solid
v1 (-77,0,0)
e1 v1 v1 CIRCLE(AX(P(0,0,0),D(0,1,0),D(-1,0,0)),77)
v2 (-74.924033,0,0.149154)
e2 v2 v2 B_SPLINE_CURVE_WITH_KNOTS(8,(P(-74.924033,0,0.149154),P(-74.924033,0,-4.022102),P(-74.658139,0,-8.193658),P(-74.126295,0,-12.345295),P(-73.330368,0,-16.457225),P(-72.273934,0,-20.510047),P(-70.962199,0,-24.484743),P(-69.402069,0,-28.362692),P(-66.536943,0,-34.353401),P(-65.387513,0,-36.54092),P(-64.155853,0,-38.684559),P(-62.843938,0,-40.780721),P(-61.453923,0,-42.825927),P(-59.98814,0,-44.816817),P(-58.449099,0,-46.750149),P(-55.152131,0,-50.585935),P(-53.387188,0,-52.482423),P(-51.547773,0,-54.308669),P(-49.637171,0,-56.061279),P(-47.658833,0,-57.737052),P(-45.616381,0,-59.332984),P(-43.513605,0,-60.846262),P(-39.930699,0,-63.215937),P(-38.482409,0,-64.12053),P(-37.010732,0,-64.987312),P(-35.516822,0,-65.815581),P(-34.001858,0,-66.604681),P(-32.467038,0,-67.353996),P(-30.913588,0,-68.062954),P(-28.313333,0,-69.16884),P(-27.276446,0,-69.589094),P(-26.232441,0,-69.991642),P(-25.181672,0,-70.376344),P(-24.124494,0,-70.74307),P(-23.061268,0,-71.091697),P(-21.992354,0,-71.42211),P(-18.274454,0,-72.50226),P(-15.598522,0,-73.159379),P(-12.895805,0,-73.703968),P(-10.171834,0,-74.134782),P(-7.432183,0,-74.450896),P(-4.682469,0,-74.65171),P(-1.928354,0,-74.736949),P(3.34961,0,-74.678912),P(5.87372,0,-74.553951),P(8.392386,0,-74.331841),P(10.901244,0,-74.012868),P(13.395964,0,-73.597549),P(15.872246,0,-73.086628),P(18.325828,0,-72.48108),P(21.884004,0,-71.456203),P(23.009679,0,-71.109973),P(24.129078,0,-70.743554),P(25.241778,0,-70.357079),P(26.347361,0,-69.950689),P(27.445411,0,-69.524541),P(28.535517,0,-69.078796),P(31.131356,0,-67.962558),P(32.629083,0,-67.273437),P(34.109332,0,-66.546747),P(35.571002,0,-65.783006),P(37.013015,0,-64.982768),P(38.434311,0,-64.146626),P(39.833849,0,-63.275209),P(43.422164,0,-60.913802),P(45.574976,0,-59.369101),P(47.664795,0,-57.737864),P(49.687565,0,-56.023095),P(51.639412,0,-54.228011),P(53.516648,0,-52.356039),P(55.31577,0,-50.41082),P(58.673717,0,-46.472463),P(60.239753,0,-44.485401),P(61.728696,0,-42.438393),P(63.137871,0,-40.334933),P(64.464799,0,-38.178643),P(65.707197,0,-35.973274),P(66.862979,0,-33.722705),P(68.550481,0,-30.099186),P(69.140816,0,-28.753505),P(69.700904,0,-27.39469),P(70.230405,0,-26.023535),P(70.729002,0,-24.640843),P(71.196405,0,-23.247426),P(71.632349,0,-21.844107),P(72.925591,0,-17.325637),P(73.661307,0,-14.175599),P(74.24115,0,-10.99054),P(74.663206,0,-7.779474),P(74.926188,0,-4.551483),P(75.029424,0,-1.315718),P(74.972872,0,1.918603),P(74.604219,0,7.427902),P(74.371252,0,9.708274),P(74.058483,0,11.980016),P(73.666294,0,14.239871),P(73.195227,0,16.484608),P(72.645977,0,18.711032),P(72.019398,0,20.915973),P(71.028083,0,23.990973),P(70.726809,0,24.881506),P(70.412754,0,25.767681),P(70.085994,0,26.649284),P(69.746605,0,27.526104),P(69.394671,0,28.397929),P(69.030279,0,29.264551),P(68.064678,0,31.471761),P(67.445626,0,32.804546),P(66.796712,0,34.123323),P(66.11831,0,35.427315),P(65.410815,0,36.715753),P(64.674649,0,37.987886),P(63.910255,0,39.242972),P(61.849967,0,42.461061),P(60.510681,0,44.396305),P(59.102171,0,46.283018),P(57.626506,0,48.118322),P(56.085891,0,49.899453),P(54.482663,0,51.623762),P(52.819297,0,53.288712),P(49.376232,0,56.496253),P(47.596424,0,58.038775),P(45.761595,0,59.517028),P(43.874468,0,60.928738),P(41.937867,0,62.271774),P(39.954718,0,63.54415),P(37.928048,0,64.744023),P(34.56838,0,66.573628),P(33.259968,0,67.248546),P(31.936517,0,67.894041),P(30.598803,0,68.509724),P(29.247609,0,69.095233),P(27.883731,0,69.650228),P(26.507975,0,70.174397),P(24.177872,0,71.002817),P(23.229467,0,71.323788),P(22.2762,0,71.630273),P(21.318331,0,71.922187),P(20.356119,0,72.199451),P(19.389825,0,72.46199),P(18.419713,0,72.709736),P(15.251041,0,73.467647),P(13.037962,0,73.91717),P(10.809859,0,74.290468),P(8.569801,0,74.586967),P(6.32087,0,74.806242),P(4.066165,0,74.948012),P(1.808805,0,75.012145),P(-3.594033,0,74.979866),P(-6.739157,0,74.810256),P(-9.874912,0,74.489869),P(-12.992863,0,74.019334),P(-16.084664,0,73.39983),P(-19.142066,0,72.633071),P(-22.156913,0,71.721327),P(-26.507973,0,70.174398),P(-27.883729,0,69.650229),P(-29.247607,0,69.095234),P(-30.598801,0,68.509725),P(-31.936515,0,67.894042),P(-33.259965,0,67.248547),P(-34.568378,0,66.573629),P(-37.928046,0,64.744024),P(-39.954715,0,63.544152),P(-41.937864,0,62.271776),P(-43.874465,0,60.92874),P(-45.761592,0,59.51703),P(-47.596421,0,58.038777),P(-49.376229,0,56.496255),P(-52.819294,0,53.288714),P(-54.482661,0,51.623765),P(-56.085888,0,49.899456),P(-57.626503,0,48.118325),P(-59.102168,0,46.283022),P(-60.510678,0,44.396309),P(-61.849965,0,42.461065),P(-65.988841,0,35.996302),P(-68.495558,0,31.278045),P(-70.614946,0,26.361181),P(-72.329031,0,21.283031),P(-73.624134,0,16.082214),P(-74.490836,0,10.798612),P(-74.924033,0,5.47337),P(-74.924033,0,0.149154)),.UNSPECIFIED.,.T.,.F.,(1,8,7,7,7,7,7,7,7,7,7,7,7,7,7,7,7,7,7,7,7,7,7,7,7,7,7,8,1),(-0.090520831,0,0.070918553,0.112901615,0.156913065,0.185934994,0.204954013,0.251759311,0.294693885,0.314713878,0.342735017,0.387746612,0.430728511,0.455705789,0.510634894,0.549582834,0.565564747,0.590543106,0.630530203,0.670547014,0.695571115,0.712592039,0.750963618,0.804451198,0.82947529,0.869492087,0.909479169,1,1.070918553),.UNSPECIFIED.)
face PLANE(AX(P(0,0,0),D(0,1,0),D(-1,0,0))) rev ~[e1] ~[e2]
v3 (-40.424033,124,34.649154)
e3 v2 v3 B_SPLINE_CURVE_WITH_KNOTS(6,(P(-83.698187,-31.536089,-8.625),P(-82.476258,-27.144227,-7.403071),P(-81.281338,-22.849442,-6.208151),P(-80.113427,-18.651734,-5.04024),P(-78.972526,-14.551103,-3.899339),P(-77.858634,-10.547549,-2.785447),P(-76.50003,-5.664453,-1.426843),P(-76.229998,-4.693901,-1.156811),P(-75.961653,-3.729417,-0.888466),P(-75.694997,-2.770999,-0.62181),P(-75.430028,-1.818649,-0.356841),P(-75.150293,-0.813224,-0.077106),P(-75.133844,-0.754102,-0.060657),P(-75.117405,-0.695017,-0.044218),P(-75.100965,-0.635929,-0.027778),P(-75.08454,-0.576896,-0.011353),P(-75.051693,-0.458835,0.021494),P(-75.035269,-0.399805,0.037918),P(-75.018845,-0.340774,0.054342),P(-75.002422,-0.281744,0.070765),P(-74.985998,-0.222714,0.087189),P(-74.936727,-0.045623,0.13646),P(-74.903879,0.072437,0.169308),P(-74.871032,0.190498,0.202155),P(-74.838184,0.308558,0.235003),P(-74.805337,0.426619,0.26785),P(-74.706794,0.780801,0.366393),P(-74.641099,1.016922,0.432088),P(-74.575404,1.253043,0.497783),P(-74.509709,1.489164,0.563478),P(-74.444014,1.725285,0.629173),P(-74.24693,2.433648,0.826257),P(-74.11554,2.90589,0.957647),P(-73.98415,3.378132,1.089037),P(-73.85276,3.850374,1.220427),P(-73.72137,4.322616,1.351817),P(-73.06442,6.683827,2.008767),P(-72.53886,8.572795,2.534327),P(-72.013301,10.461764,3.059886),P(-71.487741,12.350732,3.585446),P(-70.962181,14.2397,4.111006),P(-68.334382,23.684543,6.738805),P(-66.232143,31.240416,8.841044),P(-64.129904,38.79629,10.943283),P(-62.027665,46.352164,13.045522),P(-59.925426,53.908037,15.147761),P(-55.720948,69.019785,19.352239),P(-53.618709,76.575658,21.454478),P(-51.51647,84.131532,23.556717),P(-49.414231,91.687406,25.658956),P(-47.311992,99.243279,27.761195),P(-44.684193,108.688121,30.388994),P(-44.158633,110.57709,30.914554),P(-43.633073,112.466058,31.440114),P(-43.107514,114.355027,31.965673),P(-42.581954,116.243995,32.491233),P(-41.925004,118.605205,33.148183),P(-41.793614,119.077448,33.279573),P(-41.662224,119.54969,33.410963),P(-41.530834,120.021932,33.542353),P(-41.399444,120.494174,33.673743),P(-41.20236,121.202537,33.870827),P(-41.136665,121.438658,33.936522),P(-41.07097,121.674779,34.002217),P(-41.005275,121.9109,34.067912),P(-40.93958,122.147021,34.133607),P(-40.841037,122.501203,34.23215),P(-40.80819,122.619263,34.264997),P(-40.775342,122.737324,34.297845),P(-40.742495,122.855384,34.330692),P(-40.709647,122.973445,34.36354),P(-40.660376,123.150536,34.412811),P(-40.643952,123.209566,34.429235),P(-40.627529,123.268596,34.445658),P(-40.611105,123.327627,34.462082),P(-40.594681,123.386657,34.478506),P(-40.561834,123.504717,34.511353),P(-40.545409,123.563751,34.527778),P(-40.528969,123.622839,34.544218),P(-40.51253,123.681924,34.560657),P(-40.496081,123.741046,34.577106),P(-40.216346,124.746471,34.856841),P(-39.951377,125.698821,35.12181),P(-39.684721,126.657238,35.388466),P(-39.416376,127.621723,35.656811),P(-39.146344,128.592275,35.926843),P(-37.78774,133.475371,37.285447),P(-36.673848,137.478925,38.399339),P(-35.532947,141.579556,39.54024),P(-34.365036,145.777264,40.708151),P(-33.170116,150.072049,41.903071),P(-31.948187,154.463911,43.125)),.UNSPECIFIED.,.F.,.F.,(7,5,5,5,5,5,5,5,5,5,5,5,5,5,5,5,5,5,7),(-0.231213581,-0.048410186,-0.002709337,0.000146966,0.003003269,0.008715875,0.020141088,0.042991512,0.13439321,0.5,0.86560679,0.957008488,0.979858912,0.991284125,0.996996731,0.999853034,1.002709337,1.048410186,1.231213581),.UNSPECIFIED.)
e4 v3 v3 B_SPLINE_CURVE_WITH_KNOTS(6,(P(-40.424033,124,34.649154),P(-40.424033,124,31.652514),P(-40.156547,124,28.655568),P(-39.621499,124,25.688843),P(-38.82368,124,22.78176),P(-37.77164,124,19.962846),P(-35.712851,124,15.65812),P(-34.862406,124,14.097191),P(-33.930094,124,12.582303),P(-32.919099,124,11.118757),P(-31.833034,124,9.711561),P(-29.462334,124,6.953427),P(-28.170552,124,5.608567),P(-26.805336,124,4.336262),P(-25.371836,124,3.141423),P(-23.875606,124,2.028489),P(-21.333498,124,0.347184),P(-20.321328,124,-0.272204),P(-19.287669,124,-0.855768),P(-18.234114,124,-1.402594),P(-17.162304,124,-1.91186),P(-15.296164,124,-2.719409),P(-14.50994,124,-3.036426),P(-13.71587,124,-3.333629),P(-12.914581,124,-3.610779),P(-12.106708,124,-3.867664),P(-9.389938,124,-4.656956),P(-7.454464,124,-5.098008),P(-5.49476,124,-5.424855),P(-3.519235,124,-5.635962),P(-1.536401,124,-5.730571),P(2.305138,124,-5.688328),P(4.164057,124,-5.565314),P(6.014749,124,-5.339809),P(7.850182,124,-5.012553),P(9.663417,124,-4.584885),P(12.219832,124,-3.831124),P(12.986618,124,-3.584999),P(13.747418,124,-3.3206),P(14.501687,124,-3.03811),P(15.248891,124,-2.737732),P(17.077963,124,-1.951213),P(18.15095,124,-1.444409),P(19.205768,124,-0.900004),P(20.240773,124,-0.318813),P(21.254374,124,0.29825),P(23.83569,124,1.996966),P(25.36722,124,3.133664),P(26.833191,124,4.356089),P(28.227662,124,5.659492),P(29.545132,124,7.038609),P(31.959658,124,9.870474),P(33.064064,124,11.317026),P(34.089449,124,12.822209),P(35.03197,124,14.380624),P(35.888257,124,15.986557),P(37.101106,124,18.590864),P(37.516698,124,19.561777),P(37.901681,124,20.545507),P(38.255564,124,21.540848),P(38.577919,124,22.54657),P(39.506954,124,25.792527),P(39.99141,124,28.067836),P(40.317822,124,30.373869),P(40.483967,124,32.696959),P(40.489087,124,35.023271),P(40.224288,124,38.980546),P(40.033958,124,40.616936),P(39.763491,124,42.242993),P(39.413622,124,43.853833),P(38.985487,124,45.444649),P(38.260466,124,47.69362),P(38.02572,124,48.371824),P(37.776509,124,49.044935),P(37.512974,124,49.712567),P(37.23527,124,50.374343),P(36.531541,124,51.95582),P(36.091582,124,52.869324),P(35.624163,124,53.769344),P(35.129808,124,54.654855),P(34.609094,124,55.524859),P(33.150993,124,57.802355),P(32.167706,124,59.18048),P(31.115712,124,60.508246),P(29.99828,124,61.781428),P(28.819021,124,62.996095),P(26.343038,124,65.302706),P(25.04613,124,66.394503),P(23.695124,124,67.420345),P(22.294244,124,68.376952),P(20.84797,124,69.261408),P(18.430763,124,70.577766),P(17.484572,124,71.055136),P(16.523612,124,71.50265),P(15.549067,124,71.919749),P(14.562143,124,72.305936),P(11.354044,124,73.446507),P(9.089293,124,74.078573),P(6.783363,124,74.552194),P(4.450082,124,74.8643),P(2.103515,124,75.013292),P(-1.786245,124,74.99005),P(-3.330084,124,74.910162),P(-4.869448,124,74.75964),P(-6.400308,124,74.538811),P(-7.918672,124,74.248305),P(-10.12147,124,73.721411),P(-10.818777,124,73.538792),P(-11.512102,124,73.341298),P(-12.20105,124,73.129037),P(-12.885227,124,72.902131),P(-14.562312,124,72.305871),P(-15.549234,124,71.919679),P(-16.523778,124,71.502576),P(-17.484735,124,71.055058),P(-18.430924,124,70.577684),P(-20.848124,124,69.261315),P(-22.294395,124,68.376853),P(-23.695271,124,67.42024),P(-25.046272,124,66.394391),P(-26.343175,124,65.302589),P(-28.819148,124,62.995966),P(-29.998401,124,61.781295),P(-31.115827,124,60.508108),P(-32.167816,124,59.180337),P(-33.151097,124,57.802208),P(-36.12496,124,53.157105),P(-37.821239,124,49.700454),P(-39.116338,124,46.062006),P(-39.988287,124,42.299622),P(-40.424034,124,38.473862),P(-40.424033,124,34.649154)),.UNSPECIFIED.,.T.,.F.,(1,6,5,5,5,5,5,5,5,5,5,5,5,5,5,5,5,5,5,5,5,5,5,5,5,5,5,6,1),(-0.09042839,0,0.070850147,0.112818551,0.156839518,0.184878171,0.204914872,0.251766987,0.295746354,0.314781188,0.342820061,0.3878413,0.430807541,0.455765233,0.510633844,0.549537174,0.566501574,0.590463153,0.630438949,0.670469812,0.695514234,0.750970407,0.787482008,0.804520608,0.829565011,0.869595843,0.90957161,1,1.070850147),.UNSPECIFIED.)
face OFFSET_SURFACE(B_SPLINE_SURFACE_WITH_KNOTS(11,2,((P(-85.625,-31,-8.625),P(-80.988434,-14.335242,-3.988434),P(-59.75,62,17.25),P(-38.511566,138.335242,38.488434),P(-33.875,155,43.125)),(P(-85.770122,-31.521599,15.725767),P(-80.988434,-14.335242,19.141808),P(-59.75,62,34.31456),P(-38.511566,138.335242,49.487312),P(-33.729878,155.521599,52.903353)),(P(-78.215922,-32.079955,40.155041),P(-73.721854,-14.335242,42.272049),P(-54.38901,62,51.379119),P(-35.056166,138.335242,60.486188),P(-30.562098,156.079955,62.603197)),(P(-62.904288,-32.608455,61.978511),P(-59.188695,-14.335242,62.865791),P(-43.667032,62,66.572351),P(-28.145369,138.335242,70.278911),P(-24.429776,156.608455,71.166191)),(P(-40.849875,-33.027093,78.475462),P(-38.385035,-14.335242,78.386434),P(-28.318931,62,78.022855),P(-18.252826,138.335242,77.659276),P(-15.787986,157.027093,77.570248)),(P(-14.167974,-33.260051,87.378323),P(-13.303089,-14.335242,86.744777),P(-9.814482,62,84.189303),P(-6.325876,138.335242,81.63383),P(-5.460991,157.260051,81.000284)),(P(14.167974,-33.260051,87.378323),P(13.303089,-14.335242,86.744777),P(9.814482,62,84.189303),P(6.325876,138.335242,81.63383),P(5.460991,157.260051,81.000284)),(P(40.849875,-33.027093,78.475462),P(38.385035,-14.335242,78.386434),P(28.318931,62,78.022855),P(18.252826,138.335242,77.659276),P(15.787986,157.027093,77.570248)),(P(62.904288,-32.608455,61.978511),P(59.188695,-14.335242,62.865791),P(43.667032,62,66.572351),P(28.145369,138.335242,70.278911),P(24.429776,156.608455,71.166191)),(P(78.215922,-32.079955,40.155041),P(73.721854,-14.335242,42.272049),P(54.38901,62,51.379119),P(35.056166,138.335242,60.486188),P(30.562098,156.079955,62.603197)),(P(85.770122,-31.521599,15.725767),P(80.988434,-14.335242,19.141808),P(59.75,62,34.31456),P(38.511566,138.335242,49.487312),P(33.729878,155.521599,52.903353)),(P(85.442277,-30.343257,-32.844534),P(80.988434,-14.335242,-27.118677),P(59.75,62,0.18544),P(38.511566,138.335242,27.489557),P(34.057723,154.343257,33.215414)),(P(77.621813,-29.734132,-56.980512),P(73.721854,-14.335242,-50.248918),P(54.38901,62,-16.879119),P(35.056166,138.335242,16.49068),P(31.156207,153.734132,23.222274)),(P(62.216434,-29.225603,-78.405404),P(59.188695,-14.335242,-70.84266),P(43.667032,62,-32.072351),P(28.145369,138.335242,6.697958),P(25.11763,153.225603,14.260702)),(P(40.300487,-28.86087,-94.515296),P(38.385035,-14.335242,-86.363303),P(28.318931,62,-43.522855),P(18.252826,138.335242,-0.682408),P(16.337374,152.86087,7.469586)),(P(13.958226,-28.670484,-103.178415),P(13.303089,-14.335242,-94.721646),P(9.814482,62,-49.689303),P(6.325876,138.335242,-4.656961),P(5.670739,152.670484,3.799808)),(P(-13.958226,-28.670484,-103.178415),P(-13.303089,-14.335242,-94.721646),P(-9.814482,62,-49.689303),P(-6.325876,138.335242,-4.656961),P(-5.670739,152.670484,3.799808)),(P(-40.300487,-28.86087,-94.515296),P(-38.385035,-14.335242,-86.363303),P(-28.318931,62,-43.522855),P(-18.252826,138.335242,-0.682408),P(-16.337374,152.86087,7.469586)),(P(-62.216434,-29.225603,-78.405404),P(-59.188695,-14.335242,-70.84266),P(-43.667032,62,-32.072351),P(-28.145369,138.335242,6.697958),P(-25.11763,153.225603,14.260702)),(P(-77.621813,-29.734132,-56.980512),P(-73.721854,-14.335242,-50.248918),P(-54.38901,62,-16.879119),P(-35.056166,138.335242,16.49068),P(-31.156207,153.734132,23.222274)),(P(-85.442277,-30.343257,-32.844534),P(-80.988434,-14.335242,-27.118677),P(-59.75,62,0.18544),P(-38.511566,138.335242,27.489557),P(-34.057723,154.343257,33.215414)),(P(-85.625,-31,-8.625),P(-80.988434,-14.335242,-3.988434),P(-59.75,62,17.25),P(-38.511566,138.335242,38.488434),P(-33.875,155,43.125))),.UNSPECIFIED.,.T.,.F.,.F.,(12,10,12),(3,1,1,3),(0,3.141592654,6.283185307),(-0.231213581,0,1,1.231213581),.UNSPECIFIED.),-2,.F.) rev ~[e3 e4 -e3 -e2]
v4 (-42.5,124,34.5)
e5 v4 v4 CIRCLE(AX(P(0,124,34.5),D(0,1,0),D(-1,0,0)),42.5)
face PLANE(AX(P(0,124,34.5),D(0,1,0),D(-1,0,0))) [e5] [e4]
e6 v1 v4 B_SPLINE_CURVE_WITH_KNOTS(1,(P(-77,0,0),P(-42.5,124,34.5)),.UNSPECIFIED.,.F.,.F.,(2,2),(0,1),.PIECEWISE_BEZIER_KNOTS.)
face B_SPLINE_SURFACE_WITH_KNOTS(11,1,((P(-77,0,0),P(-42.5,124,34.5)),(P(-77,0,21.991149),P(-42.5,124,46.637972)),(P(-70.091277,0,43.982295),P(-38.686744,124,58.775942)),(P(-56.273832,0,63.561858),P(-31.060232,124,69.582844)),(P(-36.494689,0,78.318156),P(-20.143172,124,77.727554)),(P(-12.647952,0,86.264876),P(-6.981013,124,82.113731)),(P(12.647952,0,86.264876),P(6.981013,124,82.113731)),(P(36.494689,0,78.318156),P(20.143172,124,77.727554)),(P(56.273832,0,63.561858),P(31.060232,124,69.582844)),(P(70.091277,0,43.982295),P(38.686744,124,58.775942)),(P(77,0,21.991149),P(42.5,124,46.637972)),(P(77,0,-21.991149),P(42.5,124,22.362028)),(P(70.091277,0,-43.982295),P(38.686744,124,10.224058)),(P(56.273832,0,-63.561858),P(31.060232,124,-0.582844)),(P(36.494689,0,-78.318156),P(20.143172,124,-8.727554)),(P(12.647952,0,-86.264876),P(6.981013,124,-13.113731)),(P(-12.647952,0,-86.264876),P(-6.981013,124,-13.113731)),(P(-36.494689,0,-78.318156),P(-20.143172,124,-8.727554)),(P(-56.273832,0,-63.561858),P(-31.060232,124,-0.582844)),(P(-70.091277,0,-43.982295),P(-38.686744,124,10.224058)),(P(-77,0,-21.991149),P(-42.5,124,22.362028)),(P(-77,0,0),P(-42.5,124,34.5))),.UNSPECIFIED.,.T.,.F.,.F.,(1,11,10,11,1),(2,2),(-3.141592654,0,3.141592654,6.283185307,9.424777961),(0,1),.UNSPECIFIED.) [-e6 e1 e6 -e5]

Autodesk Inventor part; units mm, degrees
ref_plane "YZ Plane" through (0, 0, 0) normal (1, 0, 0) x (0, 1, 0)
ref_plane "XY Plane" through (0, 0, 0) normal (0, 0, 1) x (1, 0, 0)
sketch "Szkic6" plane through (0, 0, 0) normal (0, 1, 0) x (-1, 0, 0)
  circle A0 centre (0, 0) radius 77
  dimension "d33" = 154
ref_plane "Płaszczyzna konstrukcyjna1" through (0, 124, 0) normal (0, 1, 0) x (-1, 0, 0)
sketch "Szkic7" plane through (0, 124, 0) normal (0, 1, 0) x (-1, 0, 0)
  circle A0 centre (0, 34.5) radius 42.5
  line L0 (0, -20.3) -> (0, 20.3) construction
  circle A1 centre (0, 0) radius 77 construction
  dimension "d35" = 85
loft "Wyciągnięcie złożone1" add profiles "Szkic6", "Szkic7"
shell "Skorupa1" thickness 2 removed faces 2 at (-9.753, 124, 25.7609) at (-23.2587, 0, 21.3864)
equation "\"d33\" = OD1"
equation "\"d35\" = OD2"
equation "\"d52\" = THK"
equation "\"SzerokośćGięciaPodcięcia\" = Grubość"
equation "\"RozmiarPodcięciaNarożnika\" = 4 * Grubość"
equation "\"PromieńPrzejścia\" = PromieńGięcia"
equation "\"Rozmiar_promienia_Jacobiego\" = PromieńGięcia"
equation "\"Wielk_odstępu\" = Grubość"
equation "\"d2\" = PromieńGięcia"
equation "\"d23\" = PromieńGięcia"
equation "\"OD1\" = 154"
equation "\"OD2\" = 85"
equation "\"L\" = 124"
equation "\"THK\" = 2"
equation "\"d34\" = L"
equation "\"Grubość\" = 1.5"
equation "\"PromieńGięcia\" = 3"
properties part number "Redukcja asymetryczna Ø154x85x2 L=124" material "304"
